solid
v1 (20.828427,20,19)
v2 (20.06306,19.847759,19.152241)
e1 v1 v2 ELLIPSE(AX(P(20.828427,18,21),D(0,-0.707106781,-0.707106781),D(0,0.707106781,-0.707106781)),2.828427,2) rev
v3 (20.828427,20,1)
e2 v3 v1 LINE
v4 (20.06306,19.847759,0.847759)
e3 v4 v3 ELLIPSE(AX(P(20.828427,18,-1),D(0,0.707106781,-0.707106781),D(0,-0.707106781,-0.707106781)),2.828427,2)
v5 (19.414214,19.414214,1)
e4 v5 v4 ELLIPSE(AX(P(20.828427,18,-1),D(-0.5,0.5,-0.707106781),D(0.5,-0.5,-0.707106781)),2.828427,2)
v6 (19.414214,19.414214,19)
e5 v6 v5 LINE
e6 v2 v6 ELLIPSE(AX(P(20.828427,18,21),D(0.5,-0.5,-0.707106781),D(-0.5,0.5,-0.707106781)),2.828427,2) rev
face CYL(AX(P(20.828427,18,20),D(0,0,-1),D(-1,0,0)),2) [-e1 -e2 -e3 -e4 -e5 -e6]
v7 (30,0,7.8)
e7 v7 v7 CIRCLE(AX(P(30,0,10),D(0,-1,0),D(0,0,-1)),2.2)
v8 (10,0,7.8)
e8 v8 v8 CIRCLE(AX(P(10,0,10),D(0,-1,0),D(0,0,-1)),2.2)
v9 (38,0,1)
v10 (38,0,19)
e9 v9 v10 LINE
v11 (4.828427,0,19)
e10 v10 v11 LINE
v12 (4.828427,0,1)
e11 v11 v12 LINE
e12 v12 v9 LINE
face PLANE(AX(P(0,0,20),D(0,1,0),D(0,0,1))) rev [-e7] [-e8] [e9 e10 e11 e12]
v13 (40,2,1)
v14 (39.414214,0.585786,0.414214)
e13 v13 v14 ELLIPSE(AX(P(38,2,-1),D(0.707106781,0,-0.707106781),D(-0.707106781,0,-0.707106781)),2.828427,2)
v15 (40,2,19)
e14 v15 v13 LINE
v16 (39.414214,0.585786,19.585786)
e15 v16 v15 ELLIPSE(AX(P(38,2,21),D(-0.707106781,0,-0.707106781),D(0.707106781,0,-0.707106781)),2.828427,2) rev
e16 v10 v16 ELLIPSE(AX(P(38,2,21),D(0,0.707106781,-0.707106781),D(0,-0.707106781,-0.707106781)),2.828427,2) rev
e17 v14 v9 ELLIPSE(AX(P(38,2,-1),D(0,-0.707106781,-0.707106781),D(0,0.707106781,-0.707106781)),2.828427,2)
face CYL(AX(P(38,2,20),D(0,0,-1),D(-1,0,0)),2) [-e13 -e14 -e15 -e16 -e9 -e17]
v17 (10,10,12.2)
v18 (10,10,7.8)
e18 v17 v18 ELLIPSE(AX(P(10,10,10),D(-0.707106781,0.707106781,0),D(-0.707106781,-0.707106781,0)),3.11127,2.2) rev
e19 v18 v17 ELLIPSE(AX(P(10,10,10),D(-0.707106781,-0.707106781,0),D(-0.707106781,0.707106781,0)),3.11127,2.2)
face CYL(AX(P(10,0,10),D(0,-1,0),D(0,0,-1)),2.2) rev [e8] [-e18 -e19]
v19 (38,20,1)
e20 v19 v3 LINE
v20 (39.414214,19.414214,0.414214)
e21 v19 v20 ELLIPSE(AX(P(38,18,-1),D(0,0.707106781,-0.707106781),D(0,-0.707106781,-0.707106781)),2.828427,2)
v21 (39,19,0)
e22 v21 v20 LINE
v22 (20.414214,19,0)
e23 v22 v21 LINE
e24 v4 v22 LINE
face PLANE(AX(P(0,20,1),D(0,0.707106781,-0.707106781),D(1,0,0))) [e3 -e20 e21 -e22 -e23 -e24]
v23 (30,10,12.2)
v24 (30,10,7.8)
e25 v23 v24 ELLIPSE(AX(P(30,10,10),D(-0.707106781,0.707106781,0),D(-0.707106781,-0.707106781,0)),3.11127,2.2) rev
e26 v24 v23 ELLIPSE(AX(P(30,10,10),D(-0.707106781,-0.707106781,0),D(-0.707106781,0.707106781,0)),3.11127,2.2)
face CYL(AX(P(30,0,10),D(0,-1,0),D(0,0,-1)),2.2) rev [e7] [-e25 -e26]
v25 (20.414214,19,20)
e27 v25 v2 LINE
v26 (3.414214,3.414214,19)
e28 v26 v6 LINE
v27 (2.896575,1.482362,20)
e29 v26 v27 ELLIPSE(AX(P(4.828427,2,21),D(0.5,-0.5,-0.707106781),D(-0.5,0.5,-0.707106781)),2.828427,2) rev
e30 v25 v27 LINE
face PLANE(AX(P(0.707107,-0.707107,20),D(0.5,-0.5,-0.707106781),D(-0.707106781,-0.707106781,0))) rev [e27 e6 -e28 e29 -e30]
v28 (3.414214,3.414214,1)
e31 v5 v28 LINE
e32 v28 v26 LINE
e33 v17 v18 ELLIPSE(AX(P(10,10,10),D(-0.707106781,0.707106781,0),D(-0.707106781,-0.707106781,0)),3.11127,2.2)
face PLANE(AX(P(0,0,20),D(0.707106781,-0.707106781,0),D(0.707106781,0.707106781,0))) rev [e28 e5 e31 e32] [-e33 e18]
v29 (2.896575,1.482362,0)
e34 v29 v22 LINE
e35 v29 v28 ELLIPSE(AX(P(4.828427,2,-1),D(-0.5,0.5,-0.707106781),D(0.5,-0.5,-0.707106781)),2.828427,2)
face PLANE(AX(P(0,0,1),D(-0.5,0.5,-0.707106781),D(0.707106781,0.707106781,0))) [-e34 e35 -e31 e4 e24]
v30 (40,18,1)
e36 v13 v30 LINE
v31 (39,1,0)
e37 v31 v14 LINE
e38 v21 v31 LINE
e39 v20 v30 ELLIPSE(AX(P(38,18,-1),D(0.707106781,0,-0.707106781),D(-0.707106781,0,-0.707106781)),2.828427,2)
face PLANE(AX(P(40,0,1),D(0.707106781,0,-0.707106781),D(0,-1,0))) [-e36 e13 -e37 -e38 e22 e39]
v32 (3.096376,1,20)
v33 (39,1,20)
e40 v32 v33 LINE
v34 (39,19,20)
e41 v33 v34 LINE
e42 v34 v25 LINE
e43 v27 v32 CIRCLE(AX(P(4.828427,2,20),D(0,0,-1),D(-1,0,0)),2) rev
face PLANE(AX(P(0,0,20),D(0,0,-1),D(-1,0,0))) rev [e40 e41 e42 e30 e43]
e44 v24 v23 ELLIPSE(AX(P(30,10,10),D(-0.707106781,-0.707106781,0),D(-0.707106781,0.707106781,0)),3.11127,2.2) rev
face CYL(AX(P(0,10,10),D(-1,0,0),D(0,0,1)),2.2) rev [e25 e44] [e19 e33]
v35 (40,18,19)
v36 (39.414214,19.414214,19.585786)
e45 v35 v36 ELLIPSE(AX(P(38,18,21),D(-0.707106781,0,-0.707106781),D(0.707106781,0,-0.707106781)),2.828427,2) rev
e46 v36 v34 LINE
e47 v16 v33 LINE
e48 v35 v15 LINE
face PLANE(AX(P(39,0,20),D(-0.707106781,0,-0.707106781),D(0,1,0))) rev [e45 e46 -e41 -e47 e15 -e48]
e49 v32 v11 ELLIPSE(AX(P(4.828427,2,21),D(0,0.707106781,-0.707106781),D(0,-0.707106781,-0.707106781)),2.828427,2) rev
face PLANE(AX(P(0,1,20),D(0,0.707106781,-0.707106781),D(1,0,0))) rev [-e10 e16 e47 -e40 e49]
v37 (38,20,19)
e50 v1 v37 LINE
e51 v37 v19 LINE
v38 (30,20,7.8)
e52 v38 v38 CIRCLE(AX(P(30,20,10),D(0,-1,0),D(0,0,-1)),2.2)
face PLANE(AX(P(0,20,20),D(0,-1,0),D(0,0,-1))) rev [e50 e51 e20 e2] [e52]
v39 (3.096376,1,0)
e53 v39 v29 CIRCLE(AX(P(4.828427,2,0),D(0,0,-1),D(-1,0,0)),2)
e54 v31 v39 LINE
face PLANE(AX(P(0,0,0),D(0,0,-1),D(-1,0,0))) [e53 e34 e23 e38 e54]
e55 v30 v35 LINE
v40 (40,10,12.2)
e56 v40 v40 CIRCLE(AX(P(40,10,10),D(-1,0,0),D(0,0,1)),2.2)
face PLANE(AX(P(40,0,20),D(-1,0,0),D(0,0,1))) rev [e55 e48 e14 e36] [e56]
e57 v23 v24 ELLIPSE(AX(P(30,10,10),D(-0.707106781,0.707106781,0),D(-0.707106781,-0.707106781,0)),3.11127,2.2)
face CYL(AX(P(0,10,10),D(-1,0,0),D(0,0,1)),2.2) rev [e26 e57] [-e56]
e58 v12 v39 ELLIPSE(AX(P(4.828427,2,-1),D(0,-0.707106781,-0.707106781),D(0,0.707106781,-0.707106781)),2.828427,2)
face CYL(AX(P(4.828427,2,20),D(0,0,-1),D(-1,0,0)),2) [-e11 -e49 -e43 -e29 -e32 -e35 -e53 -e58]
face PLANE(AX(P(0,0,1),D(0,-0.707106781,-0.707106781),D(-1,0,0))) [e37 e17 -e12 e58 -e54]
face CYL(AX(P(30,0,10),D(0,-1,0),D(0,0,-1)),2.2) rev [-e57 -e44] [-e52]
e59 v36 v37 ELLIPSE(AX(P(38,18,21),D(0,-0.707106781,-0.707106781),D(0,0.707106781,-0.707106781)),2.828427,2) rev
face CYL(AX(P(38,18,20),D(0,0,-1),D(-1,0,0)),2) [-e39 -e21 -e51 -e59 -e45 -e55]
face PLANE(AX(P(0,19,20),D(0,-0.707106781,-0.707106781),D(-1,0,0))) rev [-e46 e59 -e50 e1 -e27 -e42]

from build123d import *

# Parameters (mm, degrees)
SKETCH1_W                  = 40
SKETCH1_H                  = 20
BOSS_EXTRUDE1_DEPTH        = 20
F_4_4_4_4_DIAMETER_HOLE1_D = 4.4
F_4_4_4_4_DIAMETER_HOLE2_D = 4.4
F_4_4_4_4_DIAMETER_HOLE3_D = 4.4
CUT_EXTRUDE2_DEPTH         = 49.989794856
CHAMFER3_SIZE              = 1
FILLET2_R                  = 2


with BuildPart() as part:
    # Sketch1 → Boss-Extrude1 (new body)
    with BuildSketch(Plane.XY):
        with Locations((20, 10)):
            Rectangle(SKETCH1_W, SKETCH1_H)
    extrude(amount=BOSS_EXTRUDE1_DEPTH)

    # Ø4.4 (4.4) Diameter Hole1 (through all)
    with Locations(Plane.ZY):
        with Locations((10, 10)):
            Hole(F_4_4_4_4_DIAMETER_HOLE1_D / 2)

    # Ø4.4 (4.4) Diameter Hole2 (through all)
    with Locations(Plane(origin=(0, 0, 0), x_dir=(-1, 0, 0), z_dir=(0, -1, 0))):
        with Locations((-30, -10)):
            Hole(F_4_4_4_4_DIAMETER_HOLE2_D / 2)

    # Ø4.4 (4.4) Diameter Hole3 (through all)
    with Locations(Plane(origin=(0, 0, 0), x_dir=(-1, 0, 0), z_dir=(0, -1, 0))):
        with Locations((-10, -10)):
            Hole(F_4_4_4_4_DIAMETER_HOLE3_D / 2)

    # Sketch9 → Cut-Extrude2 (cut, through all)
    with BuildSketch(Plane(origin=(0, 0, 0), x_dir=(-1, 0, 0), z_dir=(0, 0, -1))):
        Polygon((0, 0), (-20, 20), (0, 20), align=None)
    extrude(amount=-CUT_EXTRUDE2_DEPTH, mode=Mode.SUBTRACT)

    # Chamfer3
    chamfer3_edges = [part.edges().sort_by_distance(p)[0] for p in [
        (40, 10, 20),
        (30, 20, 20),
        (10, 10, 20),
        (10, 10, 0),
        (30, 20, 0),
        (40, 10, 0),
        (20, 0, 0),
        (20, 0, 20),
    ]]
    chamfer(chamfer3_edges, length=CHAMFER3_SIZE)

    # Fillet2
    # the kernel refuses this fillet: 2 mm, written as the material it takes off along each edge
    with BuildSketch(Plane(origin=(0, 0, -11.071067812), x_dir=(1, 0, 0), z_dir=(0, 0, 1))) as fillet2_piece_1:
        with BuildLine():
            CenterArc((FILLET2_R * 2.41421356237, FILLET2_R), FILLET2_R, 135, 135)
            Line((FILLET2_R * 1.70710678119, FILLET2_R * 1.70710678119), (0, 0))
            Line((0, 0), (FILLET2_R * 2.41421356237, 0))
        make_face()
    extrude(amount=42.142135624, mode=Mode.SUBTRACT)
    with BuildSketch(Plane(origin=(20, 20, -1.071067812), x_dir=(-0.7071067811865476, -0.7071067811865476, 0), z_dir=(0, 0, 1))) as fillet2_piece_2:
        with BuildLine():
            CenterArc((FILLET2_R * 0.414213562373, FILLET2_R), FILLET2_R, 225, 45)
            Line((-FILLET2_R * 0.292893218813, FILLET2_R * 0.292893218813), (0, 0))
            Line((0, 0), (FILLET2_R * 0.414213562373, 0))
        make_face()
    extrude(amount=22.142135624, mode=Mode.SUBTRACT)
    with BuildSketch(Plane(origin=(40, 20, -4), x_dir=(0, -1, 0), z_dir=(0, 0, 1)), Plane(origin=(40, 0, -4), x_dir=(-1, 0, 0), z_dir=(0, 0, 1))) as fillet2_piece_3:
        with BuildLine():
            CenterArc((FILLET2_R, -FILLET2_R), FILLET2_R, 90, 90)
            Line((0, -FILLET2_R), (0, 0))
            Line((0, 0), (FILLET2_R, 0))
        make_face()
    extrude(amount=28, mode=Mode.SUBTRACT)


solid = part.part
